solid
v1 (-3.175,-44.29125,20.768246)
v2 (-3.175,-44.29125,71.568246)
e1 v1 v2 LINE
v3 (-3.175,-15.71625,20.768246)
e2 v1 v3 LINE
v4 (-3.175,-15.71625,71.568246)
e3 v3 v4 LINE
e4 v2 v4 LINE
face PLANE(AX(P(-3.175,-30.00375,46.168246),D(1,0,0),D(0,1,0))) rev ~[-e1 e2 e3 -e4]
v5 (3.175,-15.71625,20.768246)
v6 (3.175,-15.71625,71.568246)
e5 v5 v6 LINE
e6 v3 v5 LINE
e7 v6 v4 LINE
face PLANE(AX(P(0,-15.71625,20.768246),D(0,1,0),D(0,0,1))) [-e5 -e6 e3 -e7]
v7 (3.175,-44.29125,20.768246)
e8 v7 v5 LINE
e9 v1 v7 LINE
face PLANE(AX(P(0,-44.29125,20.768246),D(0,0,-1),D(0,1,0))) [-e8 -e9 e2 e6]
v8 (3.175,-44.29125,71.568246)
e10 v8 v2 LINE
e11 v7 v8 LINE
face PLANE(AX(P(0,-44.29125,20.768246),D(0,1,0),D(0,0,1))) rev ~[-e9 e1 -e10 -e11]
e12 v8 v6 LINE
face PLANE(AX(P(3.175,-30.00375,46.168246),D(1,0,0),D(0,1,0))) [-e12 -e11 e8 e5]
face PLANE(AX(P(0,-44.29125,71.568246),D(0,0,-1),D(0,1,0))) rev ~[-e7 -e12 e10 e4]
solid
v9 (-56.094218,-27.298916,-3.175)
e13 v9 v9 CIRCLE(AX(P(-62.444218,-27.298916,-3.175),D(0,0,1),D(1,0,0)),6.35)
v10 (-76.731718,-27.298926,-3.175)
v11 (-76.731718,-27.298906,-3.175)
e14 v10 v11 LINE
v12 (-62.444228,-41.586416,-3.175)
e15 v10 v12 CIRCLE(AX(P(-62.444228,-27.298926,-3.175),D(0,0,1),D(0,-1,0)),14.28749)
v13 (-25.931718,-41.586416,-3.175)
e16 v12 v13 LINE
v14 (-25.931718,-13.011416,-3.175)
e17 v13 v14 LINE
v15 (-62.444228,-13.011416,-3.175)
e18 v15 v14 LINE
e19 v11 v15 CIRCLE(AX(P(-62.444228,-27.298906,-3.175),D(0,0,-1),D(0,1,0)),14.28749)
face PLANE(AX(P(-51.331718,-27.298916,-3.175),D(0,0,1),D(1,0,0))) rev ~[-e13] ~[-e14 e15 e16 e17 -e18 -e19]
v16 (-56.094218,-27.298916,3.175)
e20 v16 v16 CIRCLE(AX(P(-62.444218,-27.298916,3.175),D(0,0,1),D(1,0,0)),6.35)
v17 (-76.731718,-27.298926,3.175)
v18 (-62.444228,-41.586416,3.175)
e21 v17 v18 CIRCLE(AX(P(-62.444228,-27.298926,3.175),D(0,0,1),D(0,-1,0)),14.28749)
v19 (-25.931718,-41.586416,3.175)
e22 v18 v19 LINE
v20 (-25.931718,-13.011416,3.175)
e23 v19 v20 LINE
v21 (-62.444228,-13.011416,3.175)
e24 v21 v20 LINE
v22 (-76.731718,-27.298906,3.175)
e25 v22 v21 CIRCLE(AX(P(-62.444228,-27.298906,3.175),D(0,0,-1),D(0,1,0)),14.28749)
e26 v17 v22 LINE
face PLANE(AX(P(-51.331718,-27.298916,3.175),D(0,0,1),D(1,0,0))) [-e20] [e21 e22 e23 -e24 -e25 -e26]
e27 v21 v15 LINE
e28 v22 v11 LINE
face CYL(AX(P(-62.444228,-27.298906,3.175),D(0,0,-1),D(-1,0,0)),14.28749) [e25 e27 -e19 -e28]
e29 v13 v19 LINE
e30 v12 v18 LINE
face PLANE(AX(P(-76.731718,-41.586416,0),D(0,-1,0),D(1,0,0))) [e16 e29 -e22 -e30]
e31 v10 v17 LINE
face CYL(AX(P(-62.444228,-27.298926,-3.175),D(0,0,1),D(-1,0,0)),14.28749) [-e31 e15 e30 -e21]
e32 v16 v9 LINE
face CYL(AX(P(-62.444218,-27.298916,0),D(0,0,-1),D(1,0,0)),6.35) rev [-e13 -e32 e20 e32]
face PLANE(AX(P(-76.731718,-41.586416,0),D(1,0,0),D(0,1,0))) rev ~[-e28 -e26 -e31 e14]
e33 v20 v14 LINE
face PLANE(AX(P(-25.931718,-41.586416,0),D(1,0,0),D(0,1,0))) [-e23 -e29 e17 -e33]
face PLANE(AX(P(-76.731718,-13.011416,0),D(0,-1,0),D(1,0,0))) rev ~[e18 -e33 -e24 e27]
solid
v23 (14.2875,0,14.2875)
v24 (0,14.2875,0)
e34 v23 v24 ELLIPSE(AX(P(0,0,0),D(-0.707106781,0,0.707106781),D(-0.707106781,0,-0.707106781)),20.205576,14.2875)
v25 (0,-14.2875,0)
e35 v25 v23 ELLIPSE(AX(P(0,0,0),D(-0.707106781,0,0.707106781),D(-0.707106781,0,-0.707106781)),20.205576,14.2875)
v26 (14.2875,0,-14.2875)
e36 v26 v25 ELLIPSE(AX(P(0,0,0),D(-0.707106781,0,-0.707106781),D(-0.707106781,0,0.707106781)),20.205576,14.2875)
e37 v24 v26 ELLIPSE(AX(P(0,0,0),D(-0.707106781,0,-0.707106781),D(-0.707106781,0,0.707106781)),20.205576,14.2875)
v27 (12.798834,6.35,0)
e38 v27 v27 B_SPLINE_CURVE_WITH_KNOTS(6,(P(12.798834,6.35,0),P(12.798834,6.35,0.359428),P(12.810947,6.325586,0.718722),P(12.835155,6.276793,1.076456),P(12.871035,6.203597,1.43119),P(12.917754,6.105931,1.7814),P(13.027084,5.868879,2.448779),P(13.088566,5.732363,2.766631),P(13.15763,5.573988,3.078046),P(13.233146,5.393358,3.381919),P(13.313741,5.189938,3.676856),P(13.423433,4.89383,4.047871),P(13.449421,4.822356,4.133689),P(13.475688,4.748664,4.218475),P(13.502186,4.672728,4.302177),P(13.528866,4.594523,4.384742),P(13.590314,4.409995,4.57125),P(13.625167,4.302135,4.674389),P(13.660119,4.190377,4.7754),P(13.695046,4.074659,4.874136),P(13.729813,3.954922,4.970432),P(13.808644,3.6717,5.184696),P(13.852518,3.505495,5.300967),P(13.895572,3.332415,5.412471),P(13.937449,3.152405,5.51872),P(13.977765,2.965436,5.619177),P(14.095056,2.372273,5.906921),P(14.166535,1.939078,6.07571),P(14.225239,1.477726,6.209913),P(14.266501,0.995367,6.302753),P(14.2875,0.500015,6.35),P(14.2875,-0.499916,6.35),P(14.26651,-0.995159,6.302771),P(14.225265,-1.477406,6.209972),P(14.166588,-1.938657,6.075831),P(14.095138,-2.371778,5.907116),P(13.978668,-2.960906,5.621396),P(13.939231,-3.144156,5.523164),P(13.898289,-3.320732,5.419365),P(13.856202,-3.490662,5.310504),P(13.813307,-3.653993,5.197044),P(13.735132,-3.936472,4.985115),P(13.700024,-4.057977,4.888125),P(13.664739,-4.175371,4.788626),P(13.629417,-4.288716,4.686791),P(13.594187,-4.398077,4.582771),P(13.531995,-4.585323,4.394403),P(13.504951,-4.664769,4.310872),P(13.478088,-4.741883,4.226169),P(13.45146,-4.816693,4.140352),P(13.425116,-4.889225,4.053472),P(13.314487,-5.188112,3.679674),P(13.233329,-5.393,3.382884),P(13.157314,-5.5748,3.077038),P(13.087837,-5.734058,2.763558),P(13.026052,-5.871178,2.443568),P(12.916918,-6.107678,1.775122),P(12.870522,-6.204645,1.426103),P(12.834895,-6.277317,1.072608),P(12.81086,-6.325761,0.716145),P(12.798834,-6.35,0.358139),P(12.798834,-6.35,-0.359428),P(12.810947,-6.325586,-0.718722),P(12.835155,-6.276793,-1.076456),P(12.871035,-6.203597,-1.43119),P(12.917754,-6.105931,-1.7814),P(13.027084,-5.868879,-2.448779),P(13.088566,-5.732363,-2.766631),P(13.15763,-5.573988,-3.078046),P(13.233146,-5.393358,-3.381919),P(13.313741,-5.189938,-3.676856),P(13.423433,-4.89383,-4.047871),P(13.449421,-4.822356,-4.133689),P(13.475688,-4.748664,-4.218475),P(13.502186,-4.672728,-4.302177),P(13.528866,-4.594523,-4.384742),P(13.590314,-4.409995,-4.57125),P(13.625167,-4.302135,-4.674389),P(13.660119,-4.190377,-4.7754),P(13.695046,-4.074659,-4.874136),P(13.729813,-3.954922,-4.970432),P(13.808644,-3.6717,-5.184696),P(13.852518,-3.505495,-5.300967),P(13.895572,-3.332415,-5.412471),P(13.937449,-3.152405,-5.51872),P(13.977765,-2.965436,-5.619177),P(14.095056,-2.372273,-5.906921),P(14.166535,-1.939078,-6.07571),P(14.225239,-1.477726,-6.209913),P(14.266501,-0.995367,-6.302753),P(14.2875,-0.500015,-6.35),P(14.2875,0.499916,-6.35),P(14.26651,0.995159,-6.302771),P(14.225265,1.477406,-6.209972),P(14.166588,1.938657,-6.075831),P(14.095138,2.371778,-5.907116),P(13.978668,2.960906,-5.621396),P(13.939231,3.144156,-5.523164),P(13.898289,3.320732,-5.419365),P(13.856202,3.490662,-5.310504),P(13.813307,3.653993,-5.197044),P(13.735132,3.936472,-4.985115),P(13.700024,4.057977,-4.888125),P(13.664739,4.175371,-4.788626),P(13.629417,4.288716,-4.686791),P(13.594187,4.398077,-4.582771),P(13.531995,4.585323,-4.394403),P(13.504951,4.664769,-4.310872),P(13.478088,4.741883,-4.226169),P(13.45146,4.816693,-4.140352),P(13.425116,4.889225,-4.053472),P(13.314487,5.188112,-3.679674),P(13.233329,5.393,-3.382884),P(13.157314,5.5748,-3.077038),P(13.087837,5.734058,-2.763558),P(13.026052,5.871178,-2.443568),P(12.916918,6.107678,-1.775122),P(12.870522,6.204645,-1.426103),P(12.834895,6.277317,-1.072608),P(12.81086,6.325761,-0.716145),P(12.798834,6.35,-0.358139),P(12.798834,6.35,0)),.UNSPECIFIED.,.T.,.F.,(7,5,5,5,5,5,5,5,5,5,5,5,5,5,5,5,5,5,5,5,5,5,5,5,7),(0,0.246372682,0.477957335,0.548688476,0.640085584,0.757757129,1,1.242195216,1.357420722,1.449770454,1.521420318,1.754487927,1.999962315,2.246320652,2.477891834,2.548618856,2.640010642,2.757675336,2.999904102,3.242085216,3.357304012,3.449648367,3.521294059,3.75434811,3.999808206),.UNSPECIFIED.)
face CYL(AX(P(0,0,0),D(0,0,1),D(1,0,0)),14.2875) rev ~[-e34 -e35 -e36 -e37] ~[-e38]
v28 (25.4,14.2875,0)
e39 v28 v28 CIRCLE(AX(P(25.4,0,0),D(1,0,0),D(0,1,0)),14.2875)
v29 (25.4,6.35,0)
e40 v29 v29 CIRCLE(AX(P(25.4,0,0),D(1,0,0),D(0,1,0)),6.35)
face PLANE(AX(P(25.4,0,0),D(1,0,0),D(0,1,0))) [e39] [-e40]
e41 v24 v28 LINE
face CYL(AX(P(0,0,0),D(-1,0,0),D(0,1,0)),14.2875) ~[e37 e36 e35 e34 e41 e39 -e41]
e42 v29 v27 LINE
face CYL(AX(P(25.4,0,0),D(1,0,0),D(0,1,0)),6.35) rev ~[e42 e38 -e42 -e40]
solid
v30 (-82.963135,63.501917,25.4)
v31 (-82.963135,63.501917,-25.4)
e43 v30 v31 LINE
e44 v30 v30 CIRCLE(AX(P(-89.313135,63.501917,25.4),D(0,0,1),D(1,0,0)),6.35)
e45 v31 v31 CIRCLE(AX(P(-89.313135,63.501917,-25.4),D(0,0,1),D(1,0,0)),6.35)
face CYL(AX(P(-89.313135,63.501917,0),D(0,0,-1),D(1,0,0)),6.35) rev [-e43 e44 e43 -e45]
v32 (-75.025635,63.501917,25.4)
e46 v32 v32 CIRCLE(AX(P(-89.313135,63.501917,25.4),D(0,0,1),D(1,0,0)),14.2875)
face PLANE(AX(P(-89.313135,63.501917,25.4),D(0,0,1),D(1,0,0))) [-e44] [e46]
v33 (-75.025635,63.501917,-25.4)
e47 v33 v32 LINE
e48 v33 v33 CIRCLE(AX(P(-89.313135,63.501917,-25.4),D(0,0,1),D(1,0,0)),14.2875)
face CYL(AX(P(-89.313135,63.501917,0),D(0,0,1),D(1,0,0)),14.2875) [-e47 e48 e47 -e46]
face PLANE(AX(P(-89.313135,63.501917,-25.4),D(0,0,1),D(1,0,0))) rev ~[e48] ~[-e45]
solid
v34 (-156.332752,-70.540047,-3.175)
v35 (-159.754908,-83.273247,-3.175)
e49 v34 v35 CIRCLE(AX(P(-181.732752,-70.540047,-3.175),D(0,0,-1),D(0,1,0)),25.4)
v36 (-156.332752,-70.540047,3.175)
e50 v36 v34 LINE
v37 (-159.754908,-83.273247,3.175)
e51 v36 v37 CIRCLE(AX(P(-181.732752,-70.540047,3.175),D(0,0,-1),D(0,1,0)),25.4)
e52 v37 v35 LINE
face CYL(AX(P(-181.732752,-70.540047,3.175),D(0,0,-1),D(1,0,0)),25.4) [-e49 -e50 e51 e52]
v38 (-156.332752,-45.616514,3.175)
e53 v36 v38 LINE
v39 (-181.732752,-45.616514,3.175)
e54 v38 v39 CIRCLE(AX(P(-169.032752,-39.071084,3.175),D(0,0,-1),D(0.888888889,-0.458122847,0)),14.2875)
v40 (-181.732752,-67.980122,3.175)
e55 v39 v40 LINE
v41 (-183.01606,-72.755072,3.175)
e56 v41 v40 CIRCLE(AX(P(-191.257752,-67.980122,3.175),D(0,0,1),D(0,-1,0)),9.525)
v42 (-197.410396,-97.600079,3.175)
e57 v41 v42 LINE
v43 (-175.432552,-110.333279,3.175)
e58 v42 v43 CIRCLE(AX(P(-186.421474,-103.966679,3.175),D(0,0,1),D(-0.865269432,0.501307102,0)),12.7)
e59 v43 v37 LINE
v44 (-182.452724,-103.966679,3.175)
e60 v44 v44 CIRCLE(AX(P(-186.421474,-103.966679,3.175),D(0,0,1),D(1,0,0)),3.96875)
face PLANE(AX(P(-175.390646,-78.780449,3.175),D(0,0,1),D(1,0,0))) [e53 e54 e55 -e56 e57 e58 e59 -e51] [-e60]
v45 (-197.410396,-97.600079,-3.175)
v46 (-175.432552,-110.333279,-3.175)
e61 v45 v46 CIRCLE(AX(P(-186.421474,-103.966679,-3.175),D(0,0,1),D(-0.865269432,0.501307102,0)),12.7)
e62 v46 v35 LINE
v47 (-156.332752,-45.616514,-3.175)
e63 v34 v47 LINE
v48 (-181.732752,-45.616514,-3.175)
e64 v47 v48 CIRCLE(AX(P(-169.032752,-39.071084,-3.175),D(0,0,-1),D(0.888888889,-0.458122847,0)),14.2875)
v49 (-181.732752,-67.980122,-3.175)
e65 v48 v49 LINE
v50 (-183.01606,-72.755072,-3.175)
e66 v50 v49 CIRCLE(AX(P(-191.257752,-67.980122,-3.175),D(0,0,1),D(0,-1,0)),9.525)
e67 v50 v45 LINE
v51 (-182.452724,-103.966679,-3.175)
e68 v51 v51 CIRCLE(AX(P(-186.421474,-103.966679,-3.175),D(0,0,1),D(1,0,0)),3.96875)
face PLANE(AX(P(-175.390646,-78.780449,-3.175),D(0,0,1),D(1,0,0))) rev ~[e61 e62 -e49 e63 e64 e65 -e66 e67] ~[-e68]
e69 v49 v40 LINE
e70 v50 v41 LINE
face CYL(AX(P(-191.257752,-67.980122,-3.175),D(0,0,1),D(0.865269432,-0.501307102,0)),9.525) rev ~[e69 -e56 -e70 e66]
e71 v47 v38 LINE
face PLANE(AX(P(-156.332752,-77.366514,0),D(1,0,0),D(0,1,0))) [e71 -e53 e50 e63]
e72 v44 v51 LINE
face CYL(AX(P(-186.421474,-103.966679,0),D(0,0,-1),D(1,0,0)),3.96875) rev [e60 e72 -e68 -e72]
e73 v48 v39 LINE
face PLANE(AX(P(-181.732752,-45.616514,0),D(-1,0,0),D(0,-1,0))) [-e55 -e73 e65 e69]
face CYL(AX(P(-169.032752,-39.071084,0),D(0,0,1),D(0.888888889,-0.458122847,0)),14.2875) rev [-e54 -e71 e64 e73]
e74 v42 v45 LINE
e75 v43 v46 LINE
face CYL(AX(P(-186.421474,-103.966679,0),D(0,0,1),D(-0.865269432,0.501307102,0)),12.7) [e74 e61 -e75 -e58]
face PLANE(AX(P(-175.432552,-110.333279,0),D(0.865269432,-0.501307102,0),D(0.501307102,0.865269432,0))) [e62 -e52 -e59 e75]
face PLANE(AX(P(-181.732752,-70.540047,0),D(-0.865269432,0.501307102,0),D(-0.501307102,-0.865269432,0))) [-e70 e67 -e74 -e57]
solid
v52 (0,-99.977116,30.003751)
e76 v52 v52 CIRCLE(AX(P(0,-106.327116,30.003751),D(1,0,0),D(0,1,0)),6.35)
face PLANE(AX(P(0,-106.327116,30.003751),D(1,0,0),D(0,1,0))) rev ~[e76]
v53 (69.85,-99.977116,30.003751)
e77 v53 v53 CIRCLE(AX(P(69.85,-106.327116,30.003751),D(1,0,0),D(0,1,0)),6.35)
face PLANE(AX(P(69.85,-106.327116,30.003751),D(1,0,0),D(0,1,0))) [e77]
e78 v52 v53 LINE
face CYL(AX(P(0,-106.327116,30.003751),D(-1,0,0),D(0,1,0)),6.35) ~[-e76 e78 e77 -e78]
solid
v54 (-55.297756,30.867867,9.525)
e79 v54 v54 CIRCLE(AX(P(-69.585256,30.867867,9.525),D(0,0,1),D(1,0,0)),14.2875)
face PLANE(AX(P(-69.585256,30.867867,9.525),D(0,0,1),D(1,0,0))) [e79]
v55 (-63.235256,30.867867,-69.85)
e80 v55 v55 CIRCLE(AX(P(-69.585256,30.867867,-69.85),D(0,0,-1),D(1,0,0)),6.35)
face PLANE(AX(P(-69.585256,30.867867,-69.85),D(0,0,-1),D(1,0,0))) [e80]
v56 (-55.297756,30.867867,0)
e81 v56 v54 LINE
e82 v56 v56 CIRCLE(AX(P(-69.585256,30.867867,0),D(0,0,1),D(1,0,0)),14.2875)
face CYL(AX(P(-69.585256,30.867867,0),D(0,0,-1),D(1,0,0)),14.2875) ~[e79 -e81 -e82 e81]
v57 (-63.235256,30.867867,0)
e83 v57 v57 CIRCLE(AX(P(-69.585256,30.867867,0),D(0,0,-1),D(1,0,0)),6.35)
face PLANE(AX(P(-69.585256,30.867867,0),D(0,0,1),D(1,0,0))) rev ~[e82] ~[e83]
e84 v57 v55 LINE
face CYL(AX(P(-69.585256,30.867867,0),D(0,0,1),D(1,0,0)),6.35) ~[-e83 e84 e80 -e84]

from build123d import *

# Parameters (mm, degrees)
F0_W      = 50.8
F0_H      = 28.575
F0_R      = 6.35
F1_DEPTH  = 3.175
F2_R      = 14.28749
F3_W      = 28.575
F3_H      = 50.8
F4_DEPTH  = 3.175
F5_R      = 14.2875
F5_R_2    = 6.35
F6_DEPTH  = 25.4
F7_R      = 14.2875
F8_DEPTH  = 9.525
F9_R      = 6.35
F10_DEPTH = 69.85
F11_R     = 14.2875
F12_DEPTH = 25.4
F13_R     = 6.35
F14_DEPTH = 25.4
F15_R     = 14.2875
F16_DEPTH = 14.2875
F17_R     = 6.35
F18_DEPTH = 69.85
F19_R     = 3.96875
F20_DEPTH = 3.175
F21_R     = 9.525
F22_R     = 25.4


# Not quite as in the source:
# - a fillet or chamfer is up to 0.001 mm smaller than in the source, because OpenCascade refuses the exact size


with BuildPart() as f1:
    # F0 (on Top) → F1 (new body, symmetric)
    with BuildSketch(Plane.XY):
        with Locations((-51.3317184523, -27.2989158346)):
            Rectangle(F0_W, F0_H)
        with Locations((-62.4442184523, -27.2989158346)):
            Circle(F0_R, mode=Mode.SUBTRACT)
    extrude(amount=F1_DEPTH, both=True)

    # F2 (radius 14.2875 in the source; OpenCascade refuses exactly that, so slightly less here)
    f2_edges = [f1.edges().sort_by_distance(p)[0] for p in [
        (-76.731718, -13.011416, 0),
        (-76.731718, -41.586416, 0),
    ]]
    fillet(f2_edges, radius=F2_R)


with BuildPart() as f4:
    # F3 (on Right) → F4 (new body, symmetric)
    with BuildSketch(Plane.YZ):
        with Locations((-30.0037502311, 46.1682456261)):
            Rectangle(F3_W, F3_H)
    extrude(amount=F4_DEPTH, both=True)


with BuildPart() as f6:
    # F5 (on Top) → F6 (new body, symmetric)
    with BuildSketch(Plane.XY):
        with Locations((-89.313134551, 63.5019168258)):
            Circle(F5_R)
        with Locations((-89.313134551, 63.5019168258)):
            Circle(F5_R_2, mode=Mode.SUBTRACT)
    extrude(amount=F6_DEPTH, both=True)


with BuildPart() as f8:
    # F7 (on Top) → F8 (new body)
    with BuildSketch(Plane.XY):
        with Locations((-69.5852562785, 30.8678671718)):
            Circle(F7_R)
    extrude(amount=F8_DEPTH)

    # F9 (on face) → F10 (join)
    with BuildSketch(Plane(origin=(0, 0, 0), x_dir=(1, 0, 0), z_dir=(0, 0, -1))):
        with Locations((-69.5852562785, -30.8678671718)):
            Circle(F9_R)
    extrude(amount=F10_DEPTH)


with BuildPart() as f12:
    # F11 (on Right) → F12 (new body)
    with BuildSketch(Plane.YZ):
        Circle(F11_R)
    extrude(amount=F12_DEPTH)

    # F13 (on face) → F14 (cut)
    with BuildSketch(Plane.YZ.offset(25.4)):
        Circle(F13_R)
    extrude(amount=-F14_DEPTH, mode=Mode.SUBTRACT)

    # F15 (on Top) → F16 (cut, symmetric)
    with BuildSketch(Plane.XY):
        Circle(F15_R)
    extrude(amount=F16_DEPTH, both=True, mode=Mode.SUBTRACT)


with BuildPart() as f18:
    # F17 (on Right) → F18 (new body)
    with BuildSketch(Plane.YZ):
        with Locations((-106.3271164894, 30.0037506968)):
            Circle(F17_R)
    extrude(amount=F18_DEPTH)


with BuildPart() as f20:
    # F19 (on Top) → F20 (new body, symmetric)
    with BuildSketch(Plane.XY):
        with BuildLine():
            Line((-156.3327515507, -77.3665141275), (-156.3327515507, -45.6165141275))
            ThreePointArc((-156.3327515507, -45.6165141275), (-169.0327515507, -53.3585839468), (-181.7327515507, -45.6165141275))
            Line((-181.7327515507, -45.6165141275), (-181.7327515507, -70.5400470396))
            Line((-181.7327515507, -70.5400470396), (-197.4103956987, -97.6000790939))
            ThreePointArc((-197.4103956987, -97.6000790939), (-198.6936811958, -107.2351542289), (-192.7880741077, -114.9556010713))
            ThreePointArc((-192.7880741077, -114.9556010713), (-183.1529989726, -116.2388865683), (-175.4325521302, -110.3332794802))
            Line((-175.4325521302, -110.3332794802), (-156.3327515507, -77.3665141275))
        make_face()
        with Locations((-186.4214739145, -103.966679287)):
            Circle(F19_R, mode=Mode.SUBTRACT)
    extrude(amount=F20_DEPTH, both=True)

    # F21
    f21_edges = [f20.edges().sort_by_distance(p)[0] for p in [
        (-181.732752, -70.540047, -1.5875),
        (-181.732752, -70.540047, 1.5875),
    ]]
    fillet(f21_edges, radius=F21_R)

    # F22
    f22_edges = [f20.edges().sort_by_distance(p)[0] for p in [
        (-156.332752, -77.366514, -1.5875),
        (-156.332752, -77.366514, 1.5875),
    ]]
    fillet(f22_edges, radius=F22_R)


solid = Compound([f1.part, f4.part, f6.part, f8.part, f12.part, f18.part, f20.part])
